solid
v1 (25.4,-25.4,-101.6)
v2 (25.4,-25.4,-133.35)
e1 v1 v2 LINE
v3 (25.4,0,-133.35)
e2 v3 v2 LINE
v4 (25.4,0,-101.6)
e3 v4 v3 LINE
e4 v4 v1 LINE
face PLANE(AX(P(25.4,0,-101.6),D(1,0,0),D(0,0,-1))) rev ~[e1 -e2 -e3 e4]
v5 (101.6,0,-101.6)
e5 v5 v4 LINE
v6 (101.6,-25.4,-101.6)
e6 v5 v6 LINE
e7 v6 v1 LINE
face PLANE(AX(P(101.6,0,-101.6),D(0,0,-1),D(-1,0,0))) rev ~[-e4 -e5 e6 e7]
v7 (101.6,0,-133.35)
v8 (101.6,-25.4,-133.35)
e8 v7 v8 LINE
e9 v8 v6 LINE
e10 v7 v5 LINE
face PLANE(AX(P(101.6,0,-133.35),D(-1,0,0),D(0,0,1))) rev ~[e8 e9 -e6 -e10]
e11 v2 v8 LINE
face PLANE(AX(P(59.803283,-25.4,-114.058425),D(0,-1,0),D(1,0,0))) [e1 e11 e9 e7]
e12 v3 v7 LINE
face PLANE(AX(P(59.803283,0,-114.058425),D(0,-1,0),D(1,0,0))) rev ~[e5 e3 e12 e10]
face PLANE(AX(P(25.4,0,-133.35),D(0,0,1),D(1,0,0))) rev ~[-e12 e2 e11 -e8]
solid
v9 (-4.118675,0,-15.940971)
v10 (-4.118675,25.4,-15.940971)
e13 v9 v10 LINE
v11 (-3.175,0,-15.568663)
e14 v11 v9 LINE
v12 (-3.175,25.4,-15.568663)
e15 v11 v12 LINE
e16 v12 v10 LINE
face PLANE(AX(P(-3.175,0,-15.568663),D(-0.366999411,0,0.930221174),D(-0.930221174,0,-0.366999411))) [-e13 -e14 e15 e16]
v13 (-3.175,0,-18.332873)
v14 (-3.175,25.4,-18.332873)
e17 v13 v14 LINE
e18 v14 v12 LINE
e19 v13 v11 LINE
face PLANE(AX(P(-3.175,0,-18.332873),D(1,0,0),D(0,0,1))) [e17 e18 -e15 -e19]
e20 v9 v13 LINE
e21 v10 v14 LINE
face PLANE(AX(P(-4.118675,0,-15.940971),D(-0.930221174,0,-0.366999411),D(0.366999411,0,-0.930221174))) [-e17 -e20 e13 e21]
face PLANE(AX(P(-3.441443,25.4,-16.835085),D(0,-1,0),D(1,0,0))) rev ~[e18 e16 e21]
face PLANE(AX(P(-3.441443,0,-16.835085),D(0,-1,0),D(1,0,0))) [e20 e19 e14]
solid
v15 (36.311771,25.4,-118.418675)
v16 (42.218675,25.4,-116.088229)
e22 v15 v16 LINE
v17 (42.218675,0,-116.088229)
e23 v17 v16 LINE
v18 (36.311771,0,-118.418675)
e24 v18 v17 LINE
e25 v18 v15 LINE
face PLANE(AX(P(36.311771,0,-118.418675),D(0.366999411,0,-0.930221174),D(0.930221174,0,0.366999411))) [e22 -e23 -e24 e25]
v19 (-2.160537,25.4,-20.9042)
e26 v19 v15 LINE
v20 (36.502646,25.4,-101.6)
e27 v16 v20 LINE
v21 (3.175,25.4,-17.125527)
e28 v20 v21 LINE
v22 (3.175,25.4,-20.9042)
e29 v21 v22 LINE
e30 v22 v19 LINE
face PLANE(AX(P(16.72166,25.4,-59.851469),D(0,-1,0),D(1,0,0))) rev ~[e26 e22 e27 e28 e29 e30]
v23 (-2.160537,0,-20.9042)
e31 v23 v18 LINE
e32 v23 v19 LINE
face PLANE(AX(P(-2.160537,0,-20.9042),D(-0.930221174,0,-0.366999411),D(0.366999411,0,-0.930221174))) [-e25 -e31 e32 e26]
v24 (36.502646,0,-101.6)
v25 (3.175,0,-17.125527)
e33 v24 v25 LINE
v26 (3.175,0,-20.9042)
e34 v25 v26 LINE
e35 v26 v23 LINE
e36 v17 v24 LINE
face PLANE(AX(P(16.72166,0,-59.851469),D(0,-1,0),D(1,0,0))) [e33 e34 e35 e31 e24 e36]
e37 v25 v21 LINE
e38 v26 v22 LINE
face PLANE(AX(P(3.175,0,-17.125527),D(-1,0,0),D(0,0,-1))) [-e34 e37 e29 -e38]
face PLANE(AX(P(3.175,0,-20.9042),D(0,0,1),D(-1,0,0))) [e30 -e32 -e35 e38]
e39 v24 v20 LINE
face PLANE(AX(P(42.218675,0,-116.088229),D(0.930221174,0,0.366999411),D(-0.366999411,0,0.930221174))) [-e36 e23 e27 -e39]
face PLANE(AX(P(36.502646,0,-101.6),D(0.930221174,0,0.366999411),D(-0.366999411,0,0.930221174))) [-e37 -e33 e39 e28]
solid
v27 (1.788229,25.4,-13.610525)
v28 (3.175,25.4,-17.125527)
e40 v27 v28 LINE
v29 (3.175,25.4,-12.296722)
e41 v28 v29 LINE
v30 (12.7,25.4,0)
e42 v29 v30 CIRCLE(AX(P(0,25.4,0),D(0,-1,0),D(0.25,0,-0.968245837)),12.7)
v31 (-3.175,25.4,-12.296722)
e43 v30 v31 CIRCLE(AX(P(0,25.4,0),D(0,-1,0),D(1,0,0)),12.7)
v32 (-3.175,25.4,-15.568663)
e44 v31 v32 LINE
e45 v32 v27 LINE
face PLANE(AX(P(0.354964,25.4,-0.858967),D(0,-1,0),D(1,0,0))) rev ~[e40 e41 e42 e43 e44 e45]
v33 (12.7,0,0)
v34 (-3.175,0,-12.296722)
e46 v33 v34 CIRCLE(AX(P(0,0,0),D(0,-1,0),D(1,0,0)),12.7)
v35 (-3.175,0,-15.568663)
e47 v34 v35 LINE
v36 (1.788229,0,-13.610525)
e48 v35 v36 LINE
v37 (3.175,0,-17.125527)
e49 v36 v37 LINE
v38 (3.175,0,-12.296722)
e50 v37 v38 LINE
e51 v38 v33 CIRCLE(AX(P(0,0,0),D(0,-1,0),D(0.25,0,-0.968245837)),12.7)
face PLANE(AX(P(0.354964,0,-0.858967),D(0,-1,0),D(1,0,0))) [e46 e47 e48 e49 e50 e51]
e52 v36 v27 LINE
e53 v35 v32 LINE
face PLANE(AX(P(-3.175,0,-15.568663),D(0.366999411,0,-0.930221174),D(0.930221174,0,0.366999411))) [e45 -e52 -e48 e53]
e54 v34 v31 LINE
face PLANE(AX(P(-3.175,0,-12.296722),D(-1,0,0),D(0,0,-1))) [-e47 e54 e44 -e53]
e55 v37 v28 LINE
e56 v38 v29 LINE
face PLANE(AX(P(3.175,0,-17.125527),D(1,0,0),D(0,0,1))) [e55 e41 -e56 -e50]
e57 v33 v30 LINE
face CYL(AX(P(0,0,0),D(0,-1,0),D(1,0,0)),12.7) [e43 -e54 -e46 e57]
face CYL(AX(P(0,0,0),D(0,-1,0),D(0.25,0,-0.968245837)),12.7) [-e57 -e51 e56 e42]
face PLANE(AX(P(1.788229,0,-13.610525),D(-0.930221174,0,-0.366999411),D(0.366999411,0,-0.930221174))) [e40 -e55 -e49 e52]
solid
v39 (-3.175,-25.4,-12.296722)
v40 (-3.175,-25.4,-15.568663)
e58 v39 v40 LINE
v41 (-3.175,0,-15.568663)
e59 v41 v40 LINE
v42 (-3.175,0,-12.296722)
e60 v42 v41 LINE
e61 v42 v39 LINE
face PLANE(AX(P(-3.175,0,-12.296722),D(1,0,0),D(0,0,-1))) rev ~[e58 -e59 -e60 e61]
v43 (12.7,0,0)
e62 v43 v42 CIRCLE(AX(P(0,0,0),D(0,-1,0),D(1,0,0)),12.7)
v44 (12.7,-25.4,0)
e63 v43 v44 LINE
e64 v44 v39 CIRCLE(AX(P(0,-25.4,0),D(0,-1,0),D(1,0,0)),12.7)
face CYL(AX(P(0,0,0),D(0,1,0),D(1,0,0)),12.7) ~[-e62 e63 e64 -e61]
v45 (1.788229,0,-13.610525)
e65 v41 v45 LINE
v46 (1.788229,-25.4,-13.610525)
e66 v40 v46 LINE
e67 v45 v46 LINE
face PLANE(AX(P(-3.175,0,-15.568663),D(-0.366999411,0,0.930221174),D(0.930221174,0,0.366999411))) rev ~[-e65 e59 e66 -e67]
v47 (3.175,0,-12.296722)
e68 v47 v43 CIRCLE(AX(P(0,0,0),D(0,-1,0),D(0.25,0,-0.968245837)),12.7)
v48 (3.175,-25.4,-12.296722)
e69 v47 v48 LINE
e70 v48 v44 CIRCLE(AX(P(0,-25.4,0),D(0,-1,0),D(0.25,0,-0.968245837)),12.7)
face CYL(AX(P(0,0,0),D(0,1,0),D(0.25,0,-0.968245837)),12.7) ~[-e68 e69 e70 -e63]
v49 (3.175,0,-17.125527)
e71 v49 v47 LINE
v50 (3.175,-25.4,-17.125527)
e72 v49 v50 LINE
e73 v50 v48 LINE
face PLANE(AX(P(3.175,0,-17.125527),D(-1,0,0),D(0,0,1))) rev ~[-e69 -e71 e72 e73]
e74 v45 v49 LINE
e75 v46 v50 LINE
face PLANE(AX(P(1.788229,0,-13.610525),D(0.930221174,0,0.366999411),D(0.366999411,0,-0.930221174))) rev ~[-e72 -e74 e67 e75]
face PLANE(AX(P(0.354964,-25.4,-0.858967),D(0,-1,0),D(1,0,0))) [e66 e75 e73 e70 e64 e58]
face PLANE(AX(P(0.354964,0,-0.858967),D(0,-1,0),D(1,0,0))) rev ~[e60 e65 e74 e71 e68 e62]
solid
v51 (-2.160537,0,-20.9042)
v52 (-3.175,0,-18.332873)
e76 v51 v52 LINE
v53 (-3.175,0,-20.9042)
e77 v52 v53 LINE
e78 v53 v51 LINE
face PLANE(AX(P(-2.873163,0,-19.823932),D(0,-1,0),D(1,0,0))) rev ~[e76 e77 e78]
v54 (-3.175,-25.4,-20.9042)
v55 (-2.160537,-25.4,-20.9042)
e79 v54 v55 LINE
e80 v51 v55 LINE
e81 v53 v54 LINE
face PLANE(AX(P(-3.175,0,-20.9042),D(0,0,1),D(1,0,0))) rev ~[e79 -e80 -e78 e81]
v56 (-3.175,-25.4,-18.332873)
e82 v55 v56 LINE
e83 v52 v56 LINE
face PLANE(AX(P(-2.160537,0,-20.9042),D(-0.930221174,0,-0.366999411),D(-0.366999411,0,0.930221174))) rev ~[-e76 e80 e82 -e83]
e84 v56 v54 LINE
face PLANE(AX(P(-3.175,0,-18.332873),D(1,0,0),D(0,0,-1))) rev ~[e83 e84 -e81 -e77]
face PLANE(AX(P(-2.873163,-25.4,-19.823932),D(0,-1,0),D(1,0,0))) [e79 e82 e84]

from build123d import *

# Parameters (mm, degrees)
F1_DEPTH = 25.4
F2_DEPTH = 25.4
F0_W     = 76.2
F0_H     = 6.35
F3_DEPTH = 25.4


# Not quite as in the source:
# - a feature names something its author has since deleted; it is built from what else it names


with BuildPart() as f1:
    # F0 (on Front) → F1 (new body)
    with BuildSketch(Plane.XZ):
        with BuildLine():
            ThreePointArc((3.175, -12.2967221242), (10.040231571, -7.7771299333), (12.7, 0))
            ThreePointArc((12.7, 0), (-7.7771299333, 10.040231571), (-3.175, -12.2967221242))
            Line((-3.175, -12.2967221242), (-3.175, 3.175))
            Line((-3.175, 3.175), (3.175, 3.175))
            Line((3.175, 3.175), (3.175, -12.2967221242))
        make_face()
        with BuildLine():
            Line((-3.175, 3.175), (-3.175, -12.2967221242))
            ThreePointArc((-3.175, -12.2967221242), (0, -12.7), (3.175, -12.2967221242))
            Line((3.175, -12.2967221242), (3.175, 3.175))
            Line((3.175, 3.175), (-3.175, 3.175))
        make_face()
        with BuildLine():
            ThreePointArc((3.175, -12.2967221242), (0, -12.7), (-3.175, -12.2967221242))
            Line((-3.175, -12.2967221242), (-3.175, -15.5686634239))
            Line((-3.175, -15.5686634239), (1.7882290969, -13.6105246429))
            Line((1.7882290969, -13.6105246429), (3.175, -17.1255266252))
            Line((3.175, -17.1255266252), (3.175, -12.2967221242))
        make_face()
    extrude(amount=F1_DEPTH)


with BuildPart() as f1b:
    # F0 (on Front) → F1, piece 2 (new body)
    with BuildSketch(Plane.XZ):
        Polygon((-2.1605365761, -20.9042), (-3.175, -18.3328733748), (-3.175, -20.9042), align=None)
    extrude(amount=F1_DEPTH)


with BuildPart() as f2:
    # F0 (on Front) → F2 (new body)
    with BuildSketch(Plane.XZ):
        with BuildLine():
            ThreePointArc((3.175, -12.2967221242), (10.040231571, -7.7771299333), (12.7, 0))
            ThreePointArc((12.7, 0), (-7.7771299333, 10.040231571), (-3.175, -12.2967221242))
            Line((-3.175, -12.2967221242), (-3.175, 3.175))
            Line((-3.175, 3.175), (3.175, 3.175))
            Line((3.175, 3.175), (3.175, -12.2967221242))
        make_face()
        with BuildLine():
            Line((-3.175, 3.175), (-3.175, -12.2967221242))
            ThreePointArc((-3.175, -12.2967221242), (0, -12.7), (3.175, -12.2967221242))
            Line((3.175, -12.2967221242), (3.175, 3.175))
            Line((3.175, 3.175), (-3.175, 3.175))
        make_face()
        with BuildLine():
            ThreePointArc((3.175, -12.2967221242), (0, -12.7), (-3.175, -12.2967221242))
            Line((-3.175, -12.2967221242), (-3.175, -15.5686634239))
            Line((-3.175, -15.5686634239), (1.7882290969, -13.6105246429))
            Line((1.7882290969, -13.6105246429), (3.175, -17.1255266252))
            Line((3.175, -17.1255266252), (3.175, -12.2967221242))
        make_face()
    extrude(amount=-F2_DEPTH)


with BuildPart() as f2b:
    # F0 (on Front) → F2, piece 2 (new body)
    with BuildSketch(Plane.XZ):
        Polygon((-3.175, -18.3328733748), (-3.175, -15.5686634239), (-4.1186753571, -15.9409709031), align=None)
    extrude(amount=-F2_DEPTH)


with BuildPart() as f2c:
    # F0 (on Front) → F2, piece 3 (new body)
    with BuildSketch(Plane.XZ):
        Polygon((36.5026459921, -101.6), (3.175, -17.1255266252), (3.175, -20.9042), (-2.1605365761, -20.9042), (29.6763124508, -101.6), align=None)
        Polygon((42.2186753571, -116.0882290969), (36.5026459921, -101.6), (29.6763124508, -101.6), (36.3117709031, -118.4186753571), align=None)
    extrude(amount=-F2_DEPTH)


with BuildPart() as f3:
    # F0 (on Front) → F3 (new body)
    with BuildSketch(Plane.XZ):
        Polygon((101.6, -101.6), (36.5026459921, -101.6), (42.2186753571, -116.0882290969), (36.3117709031, -118.4186753571), (29.6763124508, -101.6), (25.4, -101.6), (25.4, -127), (101.6, -127), align=None)
        Polygon((42.2186753571, -116.0882290969), (36.5026459921, -101.6), (29.6763124508, -101.6), (36.3117709031, -118.4186753571), align=None)
        with Locations((63.5, -130.175)):
            Rectangle(F0_W, F0_H)
    extrude(amount=F3_DEPTH)


solid = Compound([f1.part, f1b.part, f2.part, f2b.part, f2c.part, f3.part])
